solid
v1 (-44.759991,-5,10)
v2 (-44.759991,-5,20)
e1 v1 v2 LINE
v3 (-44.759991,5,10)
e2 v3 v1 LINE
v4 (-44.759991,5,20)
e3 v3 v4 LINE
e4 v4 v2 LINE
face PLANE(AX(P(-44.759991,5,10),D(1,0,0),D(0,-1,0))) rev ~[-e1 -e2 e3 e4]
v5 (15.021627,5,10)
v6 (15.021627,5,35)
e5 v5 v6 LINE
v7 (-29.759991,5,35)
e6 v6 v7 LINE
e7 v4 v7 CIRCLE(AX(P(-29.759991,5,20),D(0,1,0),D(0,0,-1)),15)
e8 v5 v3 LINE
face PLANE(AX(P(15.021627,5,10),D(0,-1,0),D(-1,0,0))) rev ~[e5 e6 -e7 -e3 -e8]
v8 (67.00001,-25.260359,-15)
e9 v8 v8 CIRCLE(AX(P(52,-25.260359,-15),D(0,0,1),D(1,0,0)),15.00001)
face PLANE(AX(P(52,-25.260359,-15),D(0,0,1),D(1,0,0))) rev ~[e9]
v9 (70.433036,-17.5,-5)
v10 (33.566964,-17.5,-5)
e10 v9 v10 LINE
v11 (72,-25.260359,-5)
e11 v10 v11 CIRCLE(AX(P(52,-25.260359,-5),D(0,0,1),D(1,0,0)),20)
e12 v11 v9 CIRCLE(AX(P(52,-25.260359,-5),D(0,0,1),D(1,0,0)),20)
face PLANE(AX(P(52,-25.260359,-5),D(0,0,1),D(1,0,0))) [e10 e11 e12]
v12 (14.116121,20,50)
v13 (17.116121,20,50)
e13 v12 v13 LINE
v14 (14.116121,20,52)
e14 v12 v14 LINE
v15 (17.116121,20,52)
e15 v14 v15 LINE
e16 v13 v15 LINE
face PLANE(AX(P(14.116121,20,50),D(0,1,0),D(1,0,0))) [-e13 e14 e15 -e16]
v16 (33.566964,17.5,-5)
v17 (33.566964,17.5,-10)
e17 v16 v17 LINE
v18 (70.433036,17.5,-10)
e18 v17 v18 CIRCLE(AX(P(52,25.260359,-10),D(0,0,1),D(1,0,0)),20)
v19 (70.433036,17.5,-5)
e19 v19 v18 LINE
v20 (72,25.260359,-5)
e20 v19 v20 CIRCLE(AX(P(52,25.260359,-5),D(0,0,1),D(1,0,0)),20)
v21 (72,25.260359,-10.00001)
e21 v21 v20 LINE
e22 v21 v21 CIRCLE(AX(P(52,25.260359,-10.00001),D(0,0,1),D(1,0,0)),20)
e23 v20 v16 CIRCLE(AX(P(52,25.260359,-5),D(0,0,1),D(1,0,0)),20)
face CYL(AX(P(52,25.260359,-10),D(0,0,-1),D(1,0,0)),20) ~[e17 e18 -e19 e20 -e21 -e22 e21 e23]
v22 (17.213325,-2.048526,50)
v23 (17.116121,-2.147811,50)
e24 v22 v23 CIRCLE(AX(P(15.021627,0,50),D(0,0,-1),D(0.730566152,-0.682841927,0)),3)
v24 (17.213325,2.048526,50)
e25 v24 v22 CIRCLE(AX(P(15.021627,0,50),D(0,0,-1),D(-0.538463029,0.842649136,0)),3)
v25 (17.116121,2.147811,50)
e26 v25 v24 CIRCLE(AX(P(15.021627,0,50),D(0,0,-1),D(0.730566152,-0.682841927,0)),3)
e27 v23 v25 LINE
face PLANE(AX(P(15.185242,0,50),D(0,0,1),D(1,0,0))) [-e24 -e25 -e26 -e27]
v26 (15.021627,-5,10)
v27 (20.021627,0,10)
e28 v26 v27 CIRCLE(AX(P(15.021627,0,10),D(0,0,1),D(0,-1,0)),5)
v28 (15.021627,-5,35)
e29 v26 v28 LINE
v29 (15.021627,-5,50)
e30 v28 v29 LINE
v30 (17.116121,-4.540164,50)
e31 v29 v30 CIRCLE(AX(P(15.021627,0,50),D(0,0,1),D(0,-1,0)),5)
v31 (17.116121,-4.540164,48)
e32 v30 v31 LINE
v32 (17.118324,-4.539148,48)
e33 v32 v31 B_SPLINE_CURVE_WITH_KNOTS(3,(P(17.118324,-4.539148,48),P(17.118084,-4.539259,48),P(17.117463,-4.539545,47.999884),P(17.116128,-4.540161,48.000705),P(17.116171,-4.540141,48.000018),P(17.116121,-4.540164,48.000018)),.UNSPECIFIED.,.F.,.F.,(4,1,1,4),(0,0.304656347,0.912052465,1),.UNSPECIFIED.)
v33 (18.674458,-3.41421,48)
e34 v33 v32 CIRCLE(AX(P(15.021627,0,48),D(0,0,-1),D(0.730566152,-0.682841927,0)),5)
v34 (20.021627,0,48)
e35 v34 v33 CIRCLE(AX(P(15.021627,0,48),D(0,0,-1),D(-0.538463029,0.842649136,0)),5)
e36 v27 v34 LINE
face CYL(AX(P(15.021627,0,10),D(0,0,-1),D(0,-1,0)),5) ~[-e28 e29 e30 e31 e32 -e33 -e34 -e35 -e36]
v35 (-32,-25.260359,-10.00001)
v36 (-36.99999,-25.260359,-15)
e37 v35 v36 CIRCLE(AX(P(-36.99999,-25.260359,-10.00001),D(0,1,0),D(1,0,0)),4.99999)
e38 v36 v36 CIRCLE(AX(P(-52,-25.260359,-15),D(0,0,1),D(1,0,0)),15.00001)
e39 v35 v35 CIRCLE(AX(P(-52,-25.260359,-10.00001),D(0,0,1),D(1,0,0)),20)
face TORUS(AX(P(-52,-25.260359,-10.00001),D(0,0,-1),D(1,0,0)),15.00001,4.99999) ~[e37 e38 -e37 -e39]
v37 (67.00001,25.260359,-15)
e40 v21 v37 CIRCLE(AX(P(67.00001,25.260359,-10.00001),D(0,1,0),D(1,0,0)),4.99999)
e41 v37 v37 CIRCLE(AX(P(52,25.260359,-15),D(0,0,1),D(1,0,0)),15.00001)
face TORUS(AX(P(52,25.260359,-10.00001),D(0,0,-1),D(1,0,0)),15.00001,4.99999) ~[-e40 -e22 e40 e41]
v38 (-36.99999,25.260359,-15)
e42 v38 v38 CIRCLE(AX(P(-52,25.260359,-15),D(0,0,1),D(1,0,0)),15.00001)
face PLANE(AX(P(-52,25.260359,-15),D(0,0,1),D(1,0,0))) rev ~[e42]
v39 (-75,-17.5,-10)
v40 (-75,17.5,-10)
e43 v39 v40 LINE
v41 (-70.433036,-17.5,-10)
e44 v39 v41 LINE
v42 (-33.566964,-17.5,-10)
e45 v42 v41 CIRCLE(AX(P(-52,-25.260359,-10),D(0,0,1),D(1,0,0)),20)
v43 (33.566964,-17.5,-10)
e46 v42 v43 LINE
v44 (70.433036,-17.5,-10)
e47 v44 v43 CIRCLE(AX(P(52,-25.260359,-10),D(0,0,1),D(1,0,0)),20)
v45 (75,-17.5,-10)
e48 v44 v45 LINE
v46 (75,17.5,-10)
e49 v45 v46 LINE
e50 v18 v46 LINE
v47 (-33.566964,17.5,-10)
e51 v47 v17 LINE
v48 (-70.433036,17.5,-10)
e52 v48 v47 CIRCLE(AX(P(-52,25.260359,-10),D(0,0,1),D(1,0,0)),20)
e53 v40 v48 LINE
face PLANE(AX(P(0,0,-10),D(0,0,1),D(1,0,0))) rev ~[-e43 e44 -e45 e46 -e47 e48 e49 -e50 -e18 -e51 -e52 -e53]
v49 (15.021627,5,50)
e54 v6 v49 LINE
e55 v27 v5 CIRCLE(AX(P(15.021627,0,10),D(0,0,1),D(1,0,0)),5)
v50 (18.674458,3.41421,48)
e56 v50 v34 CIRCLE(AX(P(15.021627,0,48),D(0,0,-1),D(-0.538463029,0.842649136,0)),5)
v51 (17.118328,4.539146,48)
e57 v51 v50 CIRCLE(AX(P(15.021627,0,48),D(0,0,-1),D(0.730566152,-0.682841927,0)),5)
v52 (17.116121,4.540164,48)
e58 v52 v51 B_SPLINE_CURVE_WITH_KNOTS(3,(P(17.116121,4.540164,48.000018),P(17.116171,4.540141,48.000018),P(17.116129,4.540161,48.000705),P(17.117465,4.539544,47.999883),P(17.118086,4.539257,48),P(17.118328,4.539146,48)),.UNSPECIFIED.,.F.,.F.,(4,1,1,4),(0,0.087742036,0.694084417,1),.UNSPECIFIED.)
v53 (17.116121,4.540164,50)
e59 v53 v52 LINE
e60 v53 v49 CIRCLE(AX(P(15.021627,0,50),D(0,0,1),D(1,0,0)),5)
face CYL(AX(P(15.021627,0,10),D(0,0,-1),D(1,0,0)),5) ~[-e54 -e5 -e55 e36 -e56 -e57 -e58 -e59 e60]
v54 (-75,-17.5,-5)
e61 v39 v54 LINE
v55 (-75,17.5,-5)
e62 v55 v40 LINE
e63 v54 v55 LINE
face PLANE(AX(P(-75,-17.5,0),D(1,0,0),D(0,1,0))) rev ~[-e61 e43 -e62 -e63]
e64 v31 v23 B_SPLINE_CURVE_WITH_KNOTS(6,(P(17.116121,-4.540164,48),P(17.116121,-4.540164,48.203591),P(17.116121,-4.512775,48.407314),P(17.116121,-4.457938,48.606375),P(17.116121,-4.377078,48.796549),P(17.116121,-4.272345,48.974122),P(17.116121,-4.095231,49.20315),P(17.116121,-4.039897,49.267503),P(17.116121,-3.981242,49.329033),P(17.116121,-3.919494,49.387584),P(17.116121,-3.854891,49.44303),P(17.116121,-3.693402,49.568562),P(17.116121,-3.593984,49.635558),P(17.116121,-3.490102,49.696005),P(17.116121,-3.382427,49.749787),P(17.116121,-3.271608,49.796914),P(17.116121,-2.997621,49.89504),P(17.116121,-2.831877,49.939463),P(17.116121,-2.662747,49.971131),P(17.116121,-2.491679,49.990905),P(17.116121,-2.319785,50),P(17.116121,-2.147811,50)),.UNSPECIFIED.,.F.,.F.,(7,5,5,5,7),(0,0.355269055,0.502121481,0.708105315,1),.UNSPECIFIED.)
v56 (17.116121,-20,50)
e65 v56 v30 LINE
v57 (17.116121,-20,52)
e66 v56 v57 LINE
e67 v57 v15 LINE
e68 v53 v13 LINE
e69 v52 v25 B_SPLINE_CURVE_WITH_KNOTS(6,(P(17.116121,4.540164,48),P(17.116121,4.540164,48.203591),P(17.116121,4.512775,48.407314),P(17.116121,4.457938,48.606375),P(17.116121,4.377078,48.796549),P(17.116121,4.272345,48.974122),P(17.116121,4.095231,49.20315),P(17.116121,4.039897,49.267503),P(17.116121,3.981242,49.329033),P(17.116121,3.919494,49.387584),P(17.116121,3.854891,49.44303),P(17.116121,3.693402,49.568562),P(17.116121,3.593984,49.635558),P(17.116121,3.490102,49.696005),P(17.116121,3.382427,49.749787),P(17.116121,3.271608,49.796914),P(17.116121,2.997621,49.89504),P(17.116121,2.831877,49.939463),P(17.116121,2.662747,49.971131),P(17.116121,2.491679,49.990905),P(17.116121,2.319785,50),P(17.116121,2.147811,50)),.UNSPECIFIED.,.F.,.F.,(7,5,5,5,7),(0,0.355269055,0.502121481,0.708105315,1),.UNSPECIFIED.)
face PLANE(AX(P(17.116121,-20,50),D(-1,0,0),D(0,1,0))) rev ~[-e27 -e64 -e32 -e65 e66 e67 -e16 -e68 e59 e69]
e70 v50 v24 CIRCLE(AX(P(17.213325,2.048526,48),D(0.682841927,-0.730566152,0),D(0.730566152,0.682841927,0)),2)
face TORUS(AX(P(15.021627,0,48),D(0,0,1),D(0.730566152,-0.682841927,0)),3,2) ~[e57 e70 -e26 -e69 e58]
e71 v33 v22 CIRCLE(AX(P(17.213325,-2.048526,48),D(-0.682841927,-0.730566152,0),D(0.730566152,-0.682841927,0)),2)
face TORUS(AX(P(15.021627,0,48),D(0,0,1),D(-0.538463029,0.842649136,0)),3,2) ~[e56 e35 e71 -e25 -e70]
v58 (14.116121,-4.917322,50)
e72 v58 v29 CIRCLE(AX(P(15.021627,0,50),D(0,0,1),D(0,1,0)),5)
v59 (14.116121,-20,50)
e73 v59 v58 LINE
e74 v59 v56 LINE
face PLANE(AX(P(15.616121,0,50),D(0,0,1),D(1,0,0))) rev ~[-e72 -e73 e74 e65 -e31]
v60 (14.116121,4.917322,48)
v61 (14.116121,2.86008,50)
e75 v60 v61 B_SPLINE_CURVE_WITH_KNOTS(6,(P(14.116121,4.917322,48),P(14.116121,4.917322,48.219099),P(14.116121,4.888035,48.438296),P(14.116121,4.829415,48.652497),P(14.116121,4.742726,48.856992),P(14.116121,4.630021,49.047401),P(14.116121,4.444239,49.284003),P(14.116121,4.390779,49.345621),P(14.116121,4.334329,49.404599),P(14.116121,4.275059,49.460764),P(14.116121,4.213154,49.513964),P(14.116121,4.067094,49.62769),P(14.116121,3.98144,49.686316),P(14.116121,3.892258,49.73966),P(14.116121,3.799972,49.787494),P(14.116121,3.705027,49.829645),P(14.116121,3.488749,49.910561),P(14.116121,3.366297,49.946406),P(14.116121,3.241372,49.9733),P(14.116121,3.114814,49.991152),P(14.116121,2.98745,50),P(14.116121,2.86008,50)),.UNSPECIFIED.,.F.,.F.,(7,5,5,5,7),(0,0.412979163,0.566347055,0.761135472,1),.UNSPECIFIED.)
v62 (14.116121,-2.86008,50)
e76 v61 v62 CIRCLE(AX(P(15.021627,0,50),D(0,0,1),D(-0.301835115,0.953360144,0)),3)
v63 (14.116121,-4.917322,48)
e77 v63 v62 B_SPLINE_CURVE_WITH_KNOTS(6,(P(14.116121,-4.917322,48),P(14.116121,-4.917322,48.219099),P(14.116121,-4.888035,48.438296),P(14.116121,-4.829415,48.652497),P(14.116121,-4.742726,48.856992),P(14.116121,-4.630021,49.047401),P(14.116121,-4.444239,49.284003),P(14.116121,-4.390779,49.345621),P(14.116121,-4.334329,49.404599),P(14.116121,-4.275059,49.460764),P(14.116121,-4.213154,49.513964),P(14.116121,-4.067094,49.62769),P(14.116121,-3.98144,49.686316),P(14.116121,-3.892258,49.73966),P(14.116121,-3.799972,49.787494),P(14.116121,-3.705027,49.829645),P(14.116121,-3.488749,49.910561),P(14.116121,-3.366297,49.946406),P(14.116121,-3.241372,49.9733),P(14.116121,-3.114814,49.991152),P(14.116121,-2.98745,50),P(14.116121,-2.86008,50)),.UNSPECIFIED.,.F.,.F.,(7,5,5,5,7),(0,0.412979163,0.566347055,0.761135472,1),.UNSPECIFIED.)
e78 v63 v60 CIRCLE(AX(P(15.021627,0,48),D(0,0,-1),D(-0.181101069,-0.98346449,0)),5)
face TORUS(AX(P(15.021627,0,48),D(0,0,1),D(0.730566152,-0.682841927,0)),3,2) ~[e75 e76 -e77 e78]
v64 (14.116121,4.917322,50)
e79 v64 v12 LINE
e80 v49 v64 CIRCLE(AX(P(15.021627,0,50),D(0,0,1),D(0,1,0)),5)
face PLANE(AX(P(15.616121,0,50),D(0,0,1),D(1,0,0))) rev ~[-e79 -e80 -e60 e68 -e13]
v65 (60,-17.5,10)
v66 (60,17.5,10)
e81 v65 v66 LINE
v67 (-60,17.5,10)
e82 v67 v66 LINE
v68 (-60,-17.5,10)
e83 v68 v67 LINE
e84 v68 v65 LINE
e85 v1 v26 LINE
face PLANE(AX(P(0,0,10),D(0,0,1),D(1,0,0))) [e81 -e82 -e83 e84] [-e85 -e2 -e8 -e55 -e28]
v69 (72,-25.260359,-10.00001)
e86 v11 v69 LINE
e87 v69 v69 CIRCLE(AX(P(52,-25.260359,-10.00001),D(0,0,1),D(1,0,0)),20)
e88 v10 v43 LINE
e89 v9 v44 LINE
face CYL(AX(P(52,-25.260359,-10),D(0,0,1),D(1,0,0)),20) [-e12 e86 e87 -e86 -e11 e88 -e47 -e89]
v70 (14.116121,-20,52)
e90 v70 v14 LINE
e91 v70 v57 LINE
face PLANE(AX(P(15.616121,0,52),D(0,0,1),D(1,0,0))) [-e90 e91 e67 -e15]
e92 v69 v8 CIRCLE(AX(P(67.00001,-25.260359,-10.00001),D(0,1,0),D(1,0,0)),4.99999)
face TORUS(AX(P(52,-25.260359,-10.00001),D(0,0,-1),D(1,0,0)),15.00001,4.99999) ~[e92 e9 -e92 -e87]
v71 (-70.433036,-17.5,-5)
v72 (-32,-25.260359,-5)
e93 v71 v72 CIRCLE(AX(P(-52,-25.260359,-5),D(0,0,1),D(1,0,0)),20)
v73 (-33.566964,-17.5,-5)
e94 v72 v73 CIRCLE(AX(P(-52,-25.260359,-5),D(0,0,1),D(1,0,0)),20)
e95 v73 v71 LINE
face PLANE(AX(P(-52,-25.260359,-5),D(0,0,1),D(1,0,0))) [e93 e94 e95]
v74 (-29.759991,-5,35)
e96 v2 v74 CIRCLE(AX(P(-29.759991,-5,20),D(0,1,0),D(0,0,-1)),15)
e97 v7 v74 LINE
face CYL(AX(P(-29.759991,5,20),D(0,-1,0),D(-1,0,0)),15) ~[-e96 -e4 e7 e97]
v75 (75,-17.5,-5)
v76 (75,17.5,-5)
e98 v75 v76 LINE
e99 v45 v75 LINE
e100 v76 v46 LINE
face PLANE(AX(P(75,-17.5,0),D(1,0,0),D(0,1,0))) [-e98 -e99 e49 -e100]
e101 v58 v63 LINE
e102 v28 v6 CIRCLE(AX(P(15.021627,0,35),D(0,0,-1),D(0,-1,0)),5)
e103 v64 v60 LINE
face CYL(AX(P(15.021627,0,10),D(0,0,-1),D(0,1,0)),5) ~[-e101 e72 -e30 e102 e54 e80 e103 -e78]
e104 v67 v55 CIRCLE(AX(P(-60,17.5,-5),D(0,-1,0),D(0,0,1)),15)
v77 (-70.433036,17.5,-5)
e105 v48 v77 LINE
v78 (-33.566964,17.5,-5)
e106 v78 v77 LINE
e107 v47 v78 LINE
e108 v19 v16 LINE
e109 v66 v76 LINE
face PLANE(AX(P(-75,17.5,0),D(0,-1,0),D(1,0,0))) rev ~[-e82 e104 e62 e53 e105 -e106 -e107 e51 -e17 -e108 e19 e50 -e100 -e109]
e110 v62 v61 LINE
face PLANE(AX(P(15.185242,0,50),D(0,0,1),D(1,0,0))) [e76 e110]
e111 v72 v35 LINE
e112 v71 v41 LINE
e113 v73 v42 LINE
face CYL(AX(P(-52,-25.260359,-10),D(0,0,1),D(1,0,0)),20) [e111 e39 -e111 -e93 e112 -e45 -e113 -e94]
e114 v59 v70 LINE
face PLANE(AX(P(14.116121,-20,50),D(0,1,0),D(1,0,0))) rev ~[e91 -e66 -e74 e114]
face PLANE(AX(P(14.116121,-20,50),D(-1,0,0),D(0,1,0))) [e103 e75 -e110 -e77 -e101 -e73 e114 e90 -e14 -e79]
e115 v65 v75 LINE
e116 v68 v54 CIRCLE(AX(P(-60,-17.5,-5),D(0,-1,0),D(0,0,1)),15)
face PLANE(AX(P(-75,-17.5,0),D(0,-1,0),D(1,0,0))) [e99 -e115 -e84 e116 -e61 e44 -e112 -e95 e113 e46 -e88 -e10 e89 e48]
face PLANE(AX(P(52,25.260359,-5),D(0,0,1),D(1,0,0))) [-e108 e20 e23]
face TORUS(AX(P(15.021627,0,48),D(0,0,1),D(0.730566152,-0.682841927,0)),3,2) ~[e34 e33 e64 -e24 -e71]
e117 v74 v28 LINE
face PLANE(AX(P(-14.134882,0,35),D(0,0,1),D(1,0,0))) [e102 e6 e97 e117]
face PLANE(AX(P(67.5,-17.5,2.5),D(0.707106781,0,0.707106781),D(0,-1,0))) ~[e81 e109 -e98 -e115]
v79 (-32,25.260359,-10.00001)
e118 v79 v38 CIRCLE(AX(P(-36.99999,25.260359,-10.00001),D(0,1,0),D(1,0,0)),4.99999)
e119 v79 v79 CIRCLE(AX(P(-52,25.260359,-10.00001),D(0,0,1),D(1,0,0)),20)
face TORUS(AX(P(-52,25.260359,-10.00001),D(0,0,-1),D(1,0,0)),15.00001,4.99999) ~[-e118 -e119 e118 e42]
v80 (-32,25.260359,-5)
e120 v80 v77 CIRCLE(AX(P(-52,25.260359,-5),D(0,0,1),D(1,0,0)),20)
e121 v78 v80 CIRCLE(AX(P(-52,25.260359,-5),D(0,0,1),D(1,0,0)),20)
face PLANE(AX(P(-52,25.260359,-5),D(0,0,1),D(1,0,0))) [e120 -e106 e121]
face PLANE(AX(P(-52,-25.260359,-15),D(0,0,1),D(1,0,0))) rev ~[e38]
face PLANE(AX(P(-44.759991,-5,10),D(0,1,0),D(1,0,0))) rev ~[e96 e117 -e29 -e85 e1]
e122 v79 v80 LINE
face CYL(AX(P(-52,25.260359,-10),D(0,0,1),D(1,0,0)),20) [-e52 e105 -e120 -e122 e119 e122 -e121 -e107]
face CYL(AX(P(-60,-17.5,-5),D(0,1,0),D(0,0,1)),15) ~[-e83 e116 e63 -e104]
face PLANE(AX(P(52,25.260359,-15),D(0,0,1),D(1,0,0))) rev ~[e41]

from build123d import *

# Parameters (mm, degrees)
F0_W          = 150
F0_H          = 35
F1_DEPTH      = 10
F3_R          = 20
F4_DEPTH      = 5
F5_R          = 15
F6_SIZE       = 15
F7_R          = 4.99999
F10_DEPTH     = 40
F11_DEPTH     = 25
F12_R         = 15
F14_W         = 3
F14_H         = 40
F15_DEPTH     = 2
F16_T3_ANGLE  = 273.8677552215
F16_T7_ANGLE  = 273.8677552215
F16_T11_ANGLE = 245.1581434466
F16_T15_ANGLE = 245.1581434466


# Not quite as in the source:
# - a fillet or chamfer that OpenCascade refuses, or shapes differently, is made with other operations: its cross-section is extruded or revolved along the edge and cut away or added
# - a fillet or chamfer is up to 0.001 mm smaller than in the source, because OpenCascade refuses the exact size


with BuildPart() as f1:
    # F0 (on Top) → F1 (new body, symmetric)
    with BuildSketch(Plane.XY):
        Rectangle(F0_W, F0_H)
    extrude(amount=F1_DEPTH, both=True)

    # F3 (on offset) → F4 (join, symmetric)
    with BuildSketch(Plane.XY.offset(-10)):
        with Locations((-52, -25.2603590488)):
            Circle(F3_R)
        with Locations((52, -25.2603590488)):
            Circle(F3_R)
        with Locations((52, 25.2603590488)):
            Circle(F3_R)
        with Locations((-52, 25.2603590488)):
            Circle(F3_R)
    extrude(amount=F4_DEPTH, both=True)

    # F5
    f5_edges = [f1.edges().sort_by_distance(p)[0] for p in [
        (-75, 0, 10),
    ]]
    fillet(f5_edges, radius=F5_R)

    # F6
    f6_edges = [f1.edges().sort_by_distance(p)[0] for p in [
        (75, 0, 10),
    ]]
    chamfer(f6_edges, length=F6_SIZE)

    # F7 (radius 5 in the source; OpenCascade refuses exactly that, so slightly less here)
    f7_edges = [f1.edges().sort_by_distance(p)[0] for p in [
        (32, -25.260359, -15),
        (32, 25.260359, -15),
        (-72, -25.260359, -15),
        (-72, 25.260359, -15),
    ]]
    fillet(f7_edges, radius=F7_R)

    # F9 (on offset) → F10 (join)
    with BuildSketch(Plane.XY.offset(10)):
        with BuildLine():
            ThreePointArc((15.0216268376, 5), (10.0216268376, 0), (15.0216268376, -5))
            ThreePointArc((15.0216268376, -5), (18.5571607435, -3.5355339059), (20.0216268376, 0))
            ThreePointArc((20.0216268376, 0), (18.5571607435, 3.5355339059), (15.0216268376, 5))
        make_face()
    extrude(amount=F10_DEPTH)

    # F9 (on offset) → F11 (join)
    with BuildSketch(Plane.XY.offset(10)):
        with BuildLine():
            Line((-44.7599912546, -5), (15.0216268376, -5))
            ThreePointArc((15.0216268376, -5), (10.0216268376, 0), (15.0216268376, 5))
            Line((15.0216268376, 5), (-44.7599912546, 5))
            Line((-44.7599912546, 5), (-44.7599912546, -5))
        make_face()
    extrude(amount=F11_DEPTH)

    # F12
    f12_edges = [f1.edges().sort_by_distance(p)[0] for p in [
        (-44.759991, 0, 35),
    ]]
    fillet(f12_edges, radius=F12_R)

    # F14 (on offset) → F15 (join)
    with BuildSketch(Plane.XY.offset(50)):
        with Locations((15.6161214935, 0)):
            Rectangle(F14_W, F14_H)
    extrude(amount=F15_DEPTH)

    # F16: fillet of radius 2 on 2 edges, made by hand


with BuildPart() as f16_tool1:
    # F16_s2 → F16_t3 (revolve)
    with BuildSketch(Plane(origin=(7.0041804705, 7.4937067775, 0), x_dir=(0, 0, 1), z_dir=(0.6828419269, 0.7305661522, 0))):
        with BuildLine():
            ThreePointArc((48, 15.9742921192), (49.4142135624, 15.3885056815), (50, 13.9742921192))
            Line((50, 13.9742921192), (50, 15.9742921192))
            Line((50, 15.9742921192), (48, 15.9742921192))
        make_face()
    revolve(axis=Axis((15.0216268376, 0, 50), (0, 0, -1)), revolution_arc=F16_T3_ANGLE)

    split(bisect_by=Plane.YZ.offset(17.1161214935), keep=Keep.TOP)


with BuildPart() as f16_tool5:
    # F16_s6 → F16_t7 (revolve)
    with BuildSketch(Plane(origin=(7.0041804705, 7.4937067775, 0), x_dir=(0, 0, 1), z_dir=(0.6828419269, 0.7305661522, 0))):
        with BuildLine():
            ThreePointArc((48, 15.9742921192), (49.4142135624, 15.3885056815), (50, 13.9742921192))
            Line((50, 13.9742921192), (50, 15.9742921192))
            Line((50, 15.9742921192), (48, 15.9742921192))
        make_face()
    revolve(axis=Axis((15.0216268376, 0, 50), (0, 0, -1)), revolution_arc=F16_T7_ANGLE)

    split(bisect_by=Plane.YZ.offset(14.1161214935), keep=Keep.BOTTOM)


with BuildPart() as f16_tool9:
    # F16_s10 → F16_t11 (revolve)
    with BuildSketch(Plane(origin=(10.6662198, 6.8158439522, 0), x_dir=(0, 0, 1), z_dir=(-0.8426491362, -0.5384630287, 0))):
        with BuildLine():
            ThreePointArc((48, -3.0885906834), (49.4142135624, -3.674377121), (50, -5.0885906834))
            Line((50, -5.0885906834), (50, -3.0885906834))
            Line((50, -3.0885906834), (48, -3.0885906834))
        make_face()
    revolve(axis=Axis((15.0216268376, 0, 50), (0, 0, -1)), revolution_arc=F16_T11_ANGLE)

    split(bisect_by=Plane.YZ.offset(14.1161214935), keep=Keep.BOTTOM)


with BuildPart() as f16_tool13:
    # F16_s14 → F16_t15 (revolve)
    with BuildSketch(Plane(origin=(10.6662198, 6.8158439522, 0), x_dir=(0, 0, 1), z_dir=(-0.8426491362, -0.5384630287, 0))):
        with BuildLine():
            ThreePointArc((48, -3.0885906834), (49.4142135624, -3.674377121), (50, -5.0885906834))
            Line((50, -5.0885906834), (50, -3.0885906834))
            Line((50, -3.0885906834), (48, -3.0885906834))
        make_face()
    revolve(axis=Axis((15.0216268376, 0, 50), (0, 0, -1)), revolution_arc=F16_T15_ANGLE)

    split(bisect_by=Plane.YZ.offset(17.1161214935), keep=Keep.TOP)


with BuildPart() as f1_1:
    add(f1.part)

    # F16_t17: cut F16_tool1, F16_tool5, F16_tool9, F16_tool13
    add([f16_tool1.part, f16_tool5.part, f16_tool9.part, f16_tool13.part], mode=Mode.SUBTRACT)


solid = f1_1.part
